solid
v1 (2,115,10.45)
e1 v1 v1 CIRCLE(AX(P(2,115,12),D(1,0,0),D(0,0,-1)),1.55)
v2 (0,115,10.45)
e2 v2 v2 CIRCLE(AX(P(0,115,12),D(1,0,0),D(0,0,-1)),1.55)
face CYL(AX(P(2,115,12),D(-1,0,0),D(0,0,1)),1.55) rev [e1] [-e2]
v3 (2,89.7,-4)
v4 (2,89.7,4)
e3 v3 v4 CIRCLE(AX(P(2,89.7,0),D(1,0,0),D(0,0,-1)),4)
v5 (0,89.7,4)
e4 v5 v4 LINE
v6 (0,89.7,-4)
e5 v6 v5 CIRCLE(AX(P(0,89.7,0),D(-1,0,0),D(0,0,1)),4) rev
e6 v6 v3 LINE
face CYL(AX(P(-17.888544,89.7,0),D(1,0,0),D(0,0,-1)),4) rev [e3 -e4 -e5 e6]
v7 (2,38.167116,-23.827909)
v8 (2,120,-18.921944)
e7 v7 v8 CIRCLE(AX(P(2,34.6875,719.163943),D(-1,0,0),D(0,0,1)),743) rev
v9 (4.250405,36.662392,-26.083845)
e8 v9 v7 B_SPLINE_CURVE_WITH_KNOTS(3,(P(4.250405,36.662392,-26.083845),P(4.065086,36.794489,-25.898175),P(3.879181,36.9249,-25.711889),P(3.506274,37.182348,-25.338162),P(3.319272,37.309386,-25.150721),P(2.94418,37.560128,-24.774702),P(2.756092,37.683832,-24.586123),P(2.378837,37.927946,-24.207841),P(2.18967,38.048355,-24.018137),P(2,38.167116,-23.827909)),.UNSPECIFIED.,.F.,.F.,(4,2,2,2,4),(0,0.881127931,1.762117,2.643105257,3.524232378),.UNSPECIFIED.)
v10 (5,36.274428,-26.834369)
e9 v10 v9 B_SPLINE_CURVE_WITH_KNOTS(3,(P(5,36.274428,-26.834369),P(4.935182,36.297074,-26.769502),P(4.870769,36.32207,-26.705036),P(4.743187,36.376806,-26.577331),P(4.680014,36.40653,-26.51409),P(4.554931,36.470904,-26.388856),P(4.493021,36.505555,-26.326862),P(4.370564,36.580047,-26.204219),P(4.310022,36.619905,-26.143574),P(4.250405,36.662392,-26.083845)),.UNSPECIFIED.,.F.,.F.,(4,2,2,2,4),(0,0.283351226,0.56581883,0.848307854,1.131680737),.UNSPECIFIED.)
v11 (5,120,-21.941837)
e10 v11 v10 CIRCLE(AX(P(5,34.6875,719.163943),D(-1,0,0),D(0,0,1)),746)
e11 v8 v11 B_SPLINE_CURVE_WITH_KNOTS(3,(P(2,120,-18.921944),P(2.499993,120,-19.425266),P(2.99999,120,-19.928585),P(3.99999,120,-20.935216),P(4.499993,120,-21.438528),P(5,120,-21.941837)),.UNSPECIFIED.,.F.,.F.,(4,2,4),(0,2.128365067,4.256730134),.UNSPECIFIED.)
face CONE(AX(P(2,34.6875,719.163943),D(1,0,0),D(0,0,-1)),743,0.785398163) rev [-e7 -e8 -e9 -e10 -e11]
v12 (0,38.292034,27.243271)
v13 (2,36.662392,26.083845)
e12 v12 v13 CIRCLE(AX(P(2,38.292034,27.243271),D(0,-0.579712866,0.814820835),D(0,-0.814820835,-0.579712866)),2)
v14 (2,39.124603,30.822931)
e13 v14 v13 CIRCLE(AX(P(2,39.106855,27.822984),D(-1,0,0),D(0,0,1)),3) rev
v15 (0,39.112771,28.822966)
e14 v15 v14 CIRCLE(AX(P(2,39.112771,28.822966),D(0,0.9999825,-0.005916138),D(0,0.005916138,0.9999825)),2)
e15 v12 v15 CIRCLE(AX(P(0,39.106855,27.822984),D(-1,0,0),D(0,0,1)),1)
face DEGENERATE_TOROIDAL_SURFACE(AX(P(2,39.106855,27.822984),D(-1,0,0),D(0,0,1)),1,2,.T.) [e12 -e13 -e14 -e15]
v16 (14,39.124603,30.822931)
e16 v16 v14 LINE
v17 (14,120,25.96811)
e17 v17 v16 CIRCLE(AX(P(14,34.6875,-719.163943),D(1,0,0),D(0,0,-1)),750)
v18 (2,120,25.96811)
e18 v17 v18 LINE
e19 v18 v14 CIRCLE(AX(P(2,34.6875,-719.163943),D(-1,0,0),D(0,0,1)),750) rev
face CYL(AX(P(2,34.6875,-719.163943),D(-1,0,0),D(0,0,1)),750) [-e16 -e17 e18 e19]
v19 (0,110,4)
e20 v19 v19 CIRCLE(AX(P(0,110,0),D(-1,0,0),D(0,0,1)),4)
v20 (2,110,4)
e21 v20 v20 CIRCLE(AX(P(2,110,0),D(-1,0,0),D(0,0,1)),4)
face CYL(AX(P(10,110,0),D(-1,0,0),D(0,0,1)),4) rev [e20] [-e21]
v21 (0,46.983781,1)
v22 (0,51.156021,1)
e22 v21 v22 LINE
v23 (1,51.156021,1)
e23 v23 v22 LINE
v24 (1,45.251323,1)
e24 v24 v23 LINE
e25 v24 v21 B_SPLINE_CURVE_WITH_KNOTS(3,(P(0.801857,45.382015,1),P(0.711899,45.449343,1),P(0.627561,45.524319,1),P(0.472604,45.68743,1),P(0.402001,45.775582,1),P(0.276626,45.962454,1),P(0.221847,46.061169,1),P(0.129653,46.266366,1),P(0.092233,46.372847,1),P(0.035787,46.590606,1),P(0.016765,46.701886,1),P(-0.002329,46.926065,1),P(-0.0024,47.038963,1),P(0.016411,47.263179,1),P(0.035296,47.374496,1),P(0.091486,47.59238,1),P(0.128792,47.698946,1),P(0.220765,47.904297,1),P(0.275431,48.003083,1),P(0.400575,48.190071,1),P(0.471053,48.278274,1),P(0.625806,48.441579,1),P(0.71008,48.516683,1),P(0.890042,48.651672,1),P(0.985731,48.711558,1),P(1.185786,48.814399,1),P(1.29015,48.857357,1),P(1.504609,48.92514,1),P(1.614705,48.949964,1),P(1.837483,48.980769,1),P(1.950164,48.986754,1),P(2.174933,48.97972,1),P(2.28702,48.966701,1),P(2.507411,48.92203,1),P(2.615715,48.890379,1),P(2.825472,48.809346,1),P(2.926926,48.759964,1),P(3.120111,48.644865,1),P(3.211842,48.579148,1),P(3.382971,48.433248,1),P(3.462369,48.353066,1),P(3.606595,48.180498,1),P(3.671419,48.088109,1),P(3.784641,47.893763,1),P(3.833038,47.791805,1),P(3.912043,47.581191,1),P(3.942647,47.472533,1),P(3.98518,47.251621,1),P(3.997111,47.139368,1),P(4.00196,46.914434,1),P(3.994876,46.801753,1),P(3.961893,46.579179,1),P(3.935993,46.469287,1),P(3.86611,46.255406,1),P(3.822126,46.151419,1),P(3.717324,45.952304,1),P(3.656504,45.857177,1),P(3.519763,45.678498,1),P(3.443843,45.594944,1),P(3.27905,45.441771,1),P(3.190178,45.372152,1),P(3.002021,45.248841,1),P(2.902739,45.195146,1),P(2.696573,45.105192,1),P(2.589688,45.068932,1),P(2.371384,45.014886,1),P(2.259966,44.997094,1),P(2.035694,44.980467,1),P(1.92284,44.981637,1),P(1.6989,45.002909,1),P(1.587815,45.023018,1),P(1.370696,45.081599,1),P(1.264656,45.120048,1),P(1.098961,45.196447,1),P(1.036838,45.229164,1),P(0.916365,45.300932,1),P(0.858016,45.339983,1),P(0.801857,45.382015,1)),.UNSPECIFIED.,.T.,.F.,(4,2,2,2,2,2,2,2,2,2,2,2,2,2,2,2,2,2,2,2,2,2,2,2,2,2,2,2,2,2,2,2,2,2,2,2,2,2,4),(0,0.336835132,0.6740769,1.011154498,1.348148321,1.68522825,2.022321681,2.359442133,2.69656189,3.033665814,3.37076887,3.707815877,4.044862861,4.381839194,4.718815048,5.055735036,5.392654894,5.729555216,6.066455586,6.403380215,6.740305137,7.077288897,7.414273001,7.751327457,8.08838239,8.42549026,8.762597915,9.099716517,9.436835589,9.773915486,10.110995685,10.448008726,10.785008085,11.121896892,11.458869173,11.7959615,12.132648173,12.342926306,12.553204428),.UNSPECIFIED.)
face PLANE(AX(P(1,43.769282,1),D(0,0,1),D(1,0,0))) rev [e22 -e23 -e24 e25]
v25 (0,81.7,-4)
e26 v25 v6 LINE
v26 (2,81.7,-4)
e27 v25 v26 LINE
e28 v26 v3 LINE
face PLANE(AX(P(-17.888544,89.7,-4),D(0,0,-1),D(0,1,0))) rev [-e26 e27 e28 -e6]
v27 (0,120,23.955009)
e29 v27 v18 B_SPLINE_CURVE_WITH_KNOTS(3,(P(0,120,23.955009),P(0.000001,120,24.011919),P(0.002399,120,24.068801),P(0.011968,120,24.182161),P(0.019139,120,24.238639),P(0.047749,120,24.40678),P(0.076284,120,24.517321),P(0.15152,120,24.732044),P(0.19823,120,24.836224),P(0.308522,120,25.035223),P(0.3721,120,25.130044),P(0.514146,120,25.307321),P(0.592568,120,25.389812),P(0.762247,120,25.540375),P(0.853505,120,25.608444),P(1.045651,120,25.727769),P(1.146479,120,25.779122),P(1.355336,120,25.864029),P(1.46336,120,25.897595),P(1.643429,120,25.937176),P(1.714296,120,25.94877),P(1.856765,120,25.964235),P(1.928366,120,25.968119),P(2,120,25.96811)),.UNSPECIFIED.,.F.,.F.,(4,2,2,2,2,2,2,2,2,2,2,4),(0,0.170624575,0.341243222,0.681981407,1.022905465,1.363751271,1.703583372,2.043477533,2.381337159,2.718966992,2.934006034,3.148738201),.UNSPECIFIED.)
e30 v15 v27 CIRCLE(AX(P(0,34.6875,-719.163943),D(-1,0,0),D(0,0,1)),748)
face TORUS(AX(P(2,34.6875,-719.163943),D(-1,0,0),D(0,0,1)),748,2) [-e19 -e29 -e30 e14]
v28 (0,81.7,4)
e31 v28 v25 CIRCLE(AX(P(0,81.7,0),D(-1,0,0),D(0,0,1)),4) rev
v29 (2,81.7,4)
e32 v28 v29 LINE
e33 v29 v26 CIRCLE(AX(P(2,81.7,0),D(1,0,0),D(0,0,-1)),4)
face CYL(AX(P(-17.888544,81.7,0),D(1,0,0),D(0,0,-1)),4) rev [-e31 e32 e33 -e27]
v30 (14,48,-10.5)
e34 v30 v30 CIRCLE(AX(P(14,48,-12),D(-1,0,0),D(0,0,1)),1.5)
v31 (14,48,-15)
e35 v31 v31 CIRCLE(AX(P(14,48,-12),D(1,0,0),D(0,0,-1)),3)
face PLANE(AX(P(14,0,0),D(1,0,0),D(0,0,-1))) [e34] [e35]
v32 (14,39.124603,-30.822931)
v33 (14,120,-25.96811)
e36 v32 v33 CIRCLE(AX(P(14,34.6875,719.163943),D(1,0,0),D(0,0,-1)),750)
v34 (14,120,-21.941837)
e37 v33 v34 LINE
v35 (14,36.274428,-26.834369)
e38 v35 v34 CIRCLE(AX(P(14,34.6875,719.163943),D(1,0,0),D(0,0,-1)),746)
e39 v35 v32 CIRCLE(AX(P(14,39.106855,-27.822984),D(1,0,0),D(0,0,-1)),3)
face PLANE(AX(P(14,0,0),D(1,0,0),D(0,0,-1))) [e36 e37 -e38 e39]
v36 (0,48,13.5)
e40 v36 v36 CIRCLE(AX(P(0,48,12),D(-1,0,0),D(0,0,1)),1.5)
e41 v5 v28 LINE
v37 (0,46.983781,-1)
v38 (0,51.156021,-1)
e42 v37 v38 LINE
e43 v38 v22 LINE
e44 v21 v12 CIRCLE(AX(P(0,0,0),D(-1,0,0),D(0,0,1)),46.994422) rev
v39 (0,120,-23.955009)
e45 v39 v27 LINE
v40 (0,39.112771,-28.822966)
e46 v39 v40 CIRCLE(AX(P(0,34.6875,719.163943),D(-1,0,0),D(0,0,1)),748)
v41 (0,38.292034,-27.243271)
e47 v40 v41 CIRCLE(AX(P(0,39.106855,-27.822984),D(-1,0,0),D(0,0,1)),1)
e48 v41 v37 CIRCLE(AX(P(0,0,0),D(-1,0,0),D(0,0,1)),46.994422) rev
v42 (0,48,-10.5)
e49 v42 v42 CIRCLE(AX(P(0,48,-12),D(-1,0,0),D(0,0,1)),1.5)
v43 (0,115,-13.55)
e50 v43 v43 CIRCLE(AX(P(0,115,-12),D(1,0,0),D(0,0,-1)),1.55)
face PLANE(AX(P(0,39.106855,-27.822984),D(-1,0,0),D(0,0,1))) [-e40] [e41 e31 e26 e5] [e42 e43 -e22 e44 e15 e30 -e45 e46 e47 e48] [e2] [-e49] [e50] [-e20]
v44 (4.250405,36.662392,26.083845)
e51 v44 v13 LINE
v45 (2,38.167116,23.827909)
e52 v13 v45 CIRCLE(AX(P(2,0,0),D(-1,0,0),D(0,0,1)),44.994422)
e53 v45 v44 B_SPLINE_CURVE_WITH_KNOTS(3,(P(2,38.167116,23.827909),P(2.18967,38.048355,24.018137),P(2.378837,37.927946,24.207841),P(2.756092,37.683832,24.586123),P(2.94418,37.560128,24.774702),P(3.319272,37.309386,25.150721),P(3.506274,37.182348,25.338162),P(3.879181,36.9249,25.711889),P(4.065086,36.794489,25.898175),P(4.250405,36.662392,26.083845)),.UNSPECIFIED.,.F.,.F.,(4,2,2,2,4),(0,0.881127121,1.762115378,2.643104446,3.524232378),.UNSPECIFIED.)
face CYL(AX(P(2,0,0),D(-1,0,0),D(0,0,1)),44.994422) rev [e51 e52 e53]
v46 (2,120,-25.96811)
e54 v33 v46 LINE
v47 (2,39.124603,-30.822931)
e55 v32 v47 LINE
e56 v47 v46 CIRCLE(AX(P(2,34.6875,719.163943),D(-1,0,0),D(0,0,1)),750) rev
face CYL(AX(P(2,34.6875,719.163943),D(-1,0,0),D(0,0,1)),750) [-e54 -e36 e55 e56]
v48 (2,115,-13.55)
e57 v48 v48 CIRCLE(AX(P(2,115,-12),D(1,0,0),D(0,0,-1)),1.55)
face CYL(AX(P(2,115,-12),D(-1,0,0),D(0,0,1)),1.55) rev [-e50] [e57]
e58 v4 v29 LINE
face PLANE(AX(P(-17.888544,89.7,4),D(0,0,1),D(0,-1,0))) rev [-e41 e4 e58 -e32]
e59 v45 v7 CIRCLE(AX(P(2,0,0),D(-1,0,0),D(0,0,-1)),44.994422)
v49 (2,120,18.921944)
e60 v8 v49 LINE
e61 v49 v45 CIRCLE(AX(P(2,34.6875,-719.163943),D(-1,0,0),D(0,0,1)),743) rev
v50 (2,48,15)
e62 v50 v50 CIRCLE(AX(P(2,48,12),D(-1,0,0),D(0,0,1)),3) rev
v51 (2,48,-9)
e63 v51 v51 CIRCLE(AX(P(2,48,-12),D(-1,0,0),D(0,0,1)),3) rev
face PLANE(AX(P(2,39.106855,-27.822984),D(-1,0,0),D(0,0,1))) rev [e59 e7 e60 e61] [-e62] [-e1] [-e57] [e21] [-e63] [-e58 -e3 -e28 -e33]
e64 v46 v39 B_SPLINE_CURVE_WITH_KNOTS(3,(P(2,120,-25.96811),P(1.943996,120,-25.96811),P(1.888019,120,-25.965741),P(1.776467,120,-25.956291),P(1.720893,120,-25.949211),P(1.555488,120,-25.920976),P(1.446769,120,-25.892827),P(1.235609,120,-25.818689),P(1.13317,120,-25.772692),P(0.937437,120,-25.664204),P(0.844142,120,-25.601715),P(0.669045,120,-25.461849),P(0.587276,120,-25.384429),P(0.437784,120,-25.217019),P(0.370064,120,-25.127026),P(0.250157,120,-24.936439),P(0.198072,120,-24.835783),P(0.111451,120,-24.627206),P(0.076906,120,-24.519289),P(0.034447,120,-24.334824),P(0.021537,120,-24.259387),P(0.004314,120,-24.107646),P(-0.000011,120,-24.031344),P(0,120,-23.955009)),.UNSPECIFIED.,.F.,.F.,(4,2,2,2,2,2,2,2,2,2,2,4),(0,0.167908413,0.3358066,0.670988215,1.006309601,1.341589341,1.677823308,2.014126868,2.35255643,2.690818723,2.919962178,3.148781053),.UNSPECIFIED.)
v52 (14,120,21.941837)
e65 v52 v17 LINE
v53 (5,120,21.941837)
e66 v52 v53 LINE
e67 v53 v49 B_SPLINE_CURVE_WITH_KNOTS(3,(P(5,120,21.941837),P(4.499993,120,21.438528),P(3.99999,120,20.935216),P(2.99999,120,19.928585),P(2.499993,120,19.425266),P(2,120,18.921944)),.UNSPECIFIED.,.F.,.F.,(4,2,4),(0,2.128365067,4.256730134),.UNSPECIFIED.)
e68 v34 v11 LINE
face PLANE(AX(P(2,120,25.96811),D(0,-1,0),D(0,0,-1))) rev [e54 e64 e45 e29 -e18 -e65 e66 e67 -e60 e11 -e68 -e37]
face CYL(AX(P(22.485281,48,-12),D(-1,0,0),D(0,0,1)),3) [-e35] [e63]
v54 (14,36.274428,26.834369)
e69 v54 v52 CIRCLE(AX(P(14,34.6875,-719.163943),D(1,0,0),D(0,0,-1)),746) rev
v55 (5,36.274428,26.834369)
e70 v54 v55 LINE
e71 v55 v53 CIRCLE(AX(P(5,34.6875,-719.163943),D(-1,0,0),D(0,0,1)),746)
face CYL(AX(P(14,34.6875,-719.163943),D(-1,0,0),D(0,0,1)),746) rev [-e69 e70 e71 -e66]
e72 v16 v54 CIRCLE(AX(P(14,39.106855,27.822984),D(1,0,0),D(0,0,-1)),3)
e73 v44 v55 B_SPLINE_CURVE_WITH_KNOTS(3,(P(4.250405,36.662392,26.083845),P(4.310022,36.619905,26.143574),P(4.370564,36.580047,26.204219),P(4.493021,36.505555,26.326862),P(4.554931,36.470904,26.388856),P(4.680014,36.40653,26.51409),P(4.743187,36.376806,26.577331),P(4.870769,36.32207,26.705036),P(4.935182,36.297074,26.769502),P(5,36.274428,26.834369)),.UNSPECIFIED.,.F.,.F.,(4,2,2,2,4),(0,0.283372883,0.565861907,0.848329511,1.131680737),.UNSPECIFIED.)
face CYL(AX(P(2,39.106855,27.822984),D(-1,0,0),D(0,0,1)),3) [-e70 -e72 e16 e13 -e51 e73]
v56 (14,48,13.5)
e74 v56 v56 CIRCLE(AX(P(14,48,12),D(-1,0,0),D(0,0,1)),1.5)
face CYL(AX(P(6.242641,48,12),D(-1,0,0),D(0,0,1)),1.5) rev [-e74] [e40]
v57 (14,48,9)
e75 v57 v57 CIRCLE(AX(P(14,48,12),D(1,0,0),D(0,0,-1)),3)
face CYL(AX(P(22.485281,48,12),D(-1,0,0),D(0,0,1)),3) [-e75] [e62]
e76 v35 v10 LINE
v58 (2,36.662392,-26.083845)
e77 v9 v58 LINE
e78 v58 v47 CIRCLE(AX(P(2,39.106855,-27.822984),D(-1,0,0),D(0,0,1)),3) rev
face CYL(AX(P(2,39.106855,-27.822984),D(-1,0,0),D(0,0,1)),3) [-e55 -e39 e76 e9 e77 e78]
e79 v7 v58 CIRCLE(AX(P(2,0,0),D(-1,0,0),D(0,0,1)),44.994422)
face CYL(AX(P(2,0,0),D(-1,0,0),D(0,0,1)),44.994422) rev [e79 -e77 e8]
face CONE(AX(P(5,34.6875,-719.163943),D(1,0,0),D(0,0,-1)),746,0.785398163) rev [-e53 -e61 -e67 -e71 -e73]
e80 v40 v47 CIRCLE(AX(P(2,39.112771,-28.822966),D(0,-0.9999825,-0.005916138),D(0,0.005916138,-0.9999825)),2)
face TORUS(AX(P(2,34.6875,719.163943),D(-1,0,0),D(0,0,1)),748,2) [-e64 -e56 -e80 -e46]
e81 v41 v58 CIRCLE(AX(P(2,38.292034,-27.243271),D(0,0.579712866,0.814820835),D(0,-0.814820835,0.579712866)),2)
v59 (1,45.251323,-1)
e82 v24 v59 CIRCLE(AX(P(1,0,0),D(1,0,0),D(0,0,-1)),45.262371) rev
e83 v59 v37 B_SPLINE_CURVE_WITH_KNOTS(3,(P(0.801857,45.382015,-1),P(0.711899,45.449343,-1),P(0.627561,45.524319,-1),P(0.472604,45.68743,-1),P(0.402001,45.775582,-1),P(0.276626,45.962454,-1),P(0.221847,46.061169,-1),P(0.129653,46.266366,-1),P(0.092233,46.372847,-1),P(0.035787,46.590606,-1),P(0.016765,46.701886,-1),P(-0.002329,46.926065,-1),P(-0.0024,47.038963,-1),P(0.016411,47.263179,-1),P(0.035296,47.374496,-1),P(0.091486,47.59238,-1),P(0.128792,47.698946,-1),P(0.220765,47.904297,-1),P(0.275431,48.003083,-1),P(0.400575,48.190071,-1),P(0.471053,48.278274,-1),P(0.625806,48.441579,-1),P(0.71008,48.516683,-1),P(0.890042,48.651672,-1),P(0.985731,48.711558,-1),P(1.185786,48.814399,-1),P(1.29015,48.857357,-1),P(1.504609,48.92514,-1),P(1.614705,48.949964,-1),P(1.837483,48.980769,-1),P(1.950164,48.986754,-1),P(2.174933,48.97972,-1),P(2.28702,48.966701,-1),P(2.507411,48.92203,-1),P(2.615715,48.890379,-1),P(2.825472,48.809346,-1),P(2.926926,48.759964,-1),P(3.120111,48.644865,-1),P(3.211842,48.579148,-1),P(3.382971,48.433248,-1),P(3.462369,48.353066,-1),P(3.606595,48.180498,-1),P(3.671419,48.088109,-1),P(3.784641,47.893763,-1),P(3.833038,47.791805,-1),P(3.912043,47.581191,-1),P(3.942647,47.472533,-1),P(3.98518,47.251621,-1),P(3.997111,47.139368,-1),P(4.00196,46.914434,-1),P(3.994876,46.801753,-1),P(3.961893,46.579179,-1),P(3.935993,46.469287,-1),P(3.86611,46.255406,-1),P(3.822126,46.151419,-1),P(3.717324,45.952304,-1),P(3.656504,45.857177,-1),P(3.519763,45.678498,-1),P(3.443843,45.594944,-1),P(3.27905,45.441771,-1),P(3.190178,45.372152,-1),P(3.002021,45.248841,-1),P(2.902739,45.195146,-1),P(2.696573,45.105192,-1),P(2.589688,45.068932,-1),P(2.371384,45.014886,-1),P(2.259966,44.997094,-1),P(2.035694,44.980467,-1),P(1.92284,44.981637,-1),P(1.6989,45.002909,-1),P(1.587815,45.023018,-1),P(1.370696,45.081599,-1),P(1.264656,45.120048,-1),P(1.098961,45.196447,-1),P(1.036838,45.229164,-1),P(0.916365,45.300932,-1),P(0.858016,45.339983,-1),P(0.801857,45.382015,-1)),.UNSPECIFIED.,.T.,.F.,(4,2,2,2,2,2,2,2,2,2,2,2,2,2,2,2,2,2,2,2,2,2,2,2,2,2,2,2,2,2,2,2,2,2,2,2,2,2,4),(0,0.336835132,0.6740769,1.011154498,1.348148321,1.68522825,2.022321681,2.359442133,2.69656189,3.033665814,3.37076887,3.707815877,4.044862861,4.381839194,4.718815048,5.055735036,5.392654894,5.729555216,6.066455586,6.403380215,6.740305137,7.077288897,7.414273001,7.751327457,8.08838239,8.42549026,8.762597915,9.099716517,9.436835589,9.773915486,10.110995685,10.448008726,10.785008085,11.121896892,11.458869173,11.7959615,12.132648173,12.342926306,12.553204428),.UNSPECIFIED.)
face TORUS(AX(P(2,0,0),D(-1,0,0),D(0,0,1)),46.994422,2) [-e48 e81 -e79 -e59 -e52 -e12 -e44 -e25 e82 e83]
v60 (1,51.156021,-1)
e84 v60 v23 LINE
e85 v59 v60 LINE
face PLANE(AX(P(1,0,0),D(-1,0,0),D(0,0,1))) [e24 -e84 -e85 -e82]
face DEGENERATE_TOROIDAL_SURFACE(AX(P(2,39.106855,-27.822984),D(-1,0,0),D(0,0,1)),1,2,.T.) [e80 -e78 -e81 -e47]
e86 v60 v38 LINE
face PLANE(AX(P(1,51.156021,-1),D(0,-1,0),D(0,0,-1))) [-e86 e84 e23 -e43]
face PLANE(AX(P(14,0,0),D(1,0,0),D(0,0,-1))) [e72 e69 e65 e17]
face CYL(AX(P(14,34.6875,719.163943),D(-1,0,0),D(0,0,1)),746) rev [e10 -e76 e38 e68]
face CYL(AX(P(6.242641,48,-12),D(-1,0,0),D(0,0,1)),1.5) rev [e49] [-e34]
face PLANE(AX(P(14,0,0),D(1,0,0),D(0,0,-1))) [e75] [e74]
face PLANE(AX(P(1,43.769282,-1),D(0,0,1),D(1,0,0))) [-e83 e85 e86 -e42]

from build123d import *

# Parameters (mm, degrees)
SKETCH1_R           = 1.5499999999999983
BOSS_EXTRUDE1_DEPTH = 2
CUT_EXTRUDE1_DEPTH  = 2
BOSS_EXTRUDE2_DEPTH = 12
SKETCH4_R           = 1.5000000000000009
CUT_EXTRUDE2_DEPTH  = 2
SKETCH_8_R          = 3
EXTRUDE_1_DEPTH     = 12
CHAMFER6_SIZE       = 3
SKETCH_1_R          = 4.0000000000000036
CUT_EXTRUDE_1_DEPTH = 10
SKETCH_9_R          = 1.5000000000000009
CUT_EXTRUDE_2_DEPTH = 125.68382559540109
FILLET_1_R          = 2
SKETCH_10_W         = 2
SKETCH_10_H         = 7.38673868931825
CUT_EXTRUDE_3_DEPTH = 1


with BuildPart() as part:
    # Sketch1 → Boss-Extrude1 (new body)
    with BuildSketch(Plane(origin=(0, 0, 0), x_dir=(0, 0, -1), z_dir=(1, 0, 0))):
        with BuildLine():
            Line((-25.968110327255765, 120.00000000000003), (25.968110327255765, 120.00000000000003))
            ThreePointArc((25.968110327255765, 120.00000000000003), (29.488419187011914, 79.62790655837495), (30.82293132778887, 39.124603227985936))
            ThreePointArc((30.82293132778887, 39.124603227985936), (29.206107258133628, 36.44471853371224), (26.083845229838534, 36.66239231138328))
            ThreePointArc((26.083845229838534, 36.66239231138328), (-6.3665e-13, 44.994421787238764), (-26.083845229839092, 36.66239231138189))
            ThreePointArc((-26.083845229839092, 36.66239231138189), (-29.20610725813421, 36.44471853371079), (-30.82293132778949, 39.1246032279845))
            ThreePointArc((-30.82293132778949, 39.1246032279845), (-29.488419187012596, 79.6279065583745), (-25.968110327255765, 120.00000000000003))
        make_face()
        with Locations((-11.999999999999995, 115)):
            Circle(SKETCH1_R, mode=Mode.SUBTRACT)
        with Locations((12.000000000000005, 115)):
            Circle(SKETCH1_R, mode=Mode.SUBTRACT)
    extrude(amount=BOSS_EXTRUDE1_DEPTH)

    # Sketch2 → Cut-Extrude1 (cut)
    with BuildSketch(Plane(origin=(2, 0, 0), x_dir=(0, 0, -1), z_dir=(1, 0, 0))):
        with BuildLine():
            Line((4, 89.70000000000002), (4.000000000000003, 81.7))
            ThreePointArc((4.000000000000003, 81.7), (1.16e-15, 77.7), (-4.000000000000001, 81.7))
            Line((-4.000000000000001, 81.7), (-4.0000000000000036, 89.70000000000002))
            ThreePointArc((-4.0000000000000036, 89.70000000000002), (-3.1e-16, 93.70000000000002), (4, 89.70000000000002))
        make_face()
    extrude(amount=-CUT_EXTRUDE1_DEPTH, mode=Mode.SUBTRACT)

    # Sketch3 → Boss-Extrude2 (add)
    with BuildSketch(Plane(origin=(2, 0, 0), x_dir=(0, 0, -1), z_dir=(1, 0, 0))):
        with BuildLine():
            Line((-21.94183683045926, 120.00000000000003), (-25.968110327255765, 120.00000000000003))
            ThreePointArc((-25.968110327255772, 120.00000000000003), (-29.488419187012482, 79.6279065583743), (-30.82293132778932, 39.124603227984586))
            ThreePointArc((-30.822931327789238, 39.1246032279846), (-29.56718535087633, 36.66600228940771), (-26.834368801169504, 36.274428235935545))
            ThreePointArc((-26.83436880116949, 36.27442823593551), (-25.56563052181184, 78.20602334586083), (-21.941836830459124, 120.00000000000003))
        make_face()
        with BuildLine():
            Line((25.968110327255545, 119.99999999999999), (21.941836830459355, 119.99999999999999))
            ThreePointArc((21.94183683045935, 120.00000000000006), (25.565630521812068, 78.20602334586118), (26.834368801169717, 36.27442823593619))
            ThreePointArc((26.834368801169717, 36.27442823593619), (29.567185350876464, 36.66600228940895), (30.822931327789195, 39.124603227985936))
            ThreePointArc((30.822931327789092, 39.124603227985936), (29.48841918701214, 79.62790655837497), (25.96811032725543, 119.99999999999999))
        make_face()
    extrude(amount=BOSS_EXTRUDE2_DEPTH)

    # Sketch4 → Cut-Extrude2 (cut)
    with BuildSketch(Plane.ZY):
        with Locations((-12, 48)):
            Circle(SKETCH4_R)
        with Locations((12, 48)):
            Circle(SKETCH4_R)
    extrude(amount=-CUT_EXTRUDE2_DEPTH, mode=Mode.SUBTRACT)

    # 草图8 → 凸台-拉伸1 (add)
    with BuildSketch(Plane(origin=(2, 0, 0), x_dir=(0, 0, -1), z_dir=(1, 0, 0))):
        with Locations(Location((-12, 48, 0), (0, 0, 180))):
            Circle(SKETCH_8_R)
        with Locations(Location((12, 48, 0), (0, 0, 180))):
            Circle(SKETCH_8_R)
    extrude(amount=EXTRUDE_1_DEPTH)

    # Chamfer6
    chamfer6_edges = [part.edges().sort_by_distance(p)[0] for p in [
        (2, 78.20602334586118, -25.565630521811954),
        (2, 78.20602334586081, 25.565630521811727),
    ]]
    chamfer(chamfer6_edges, length=CHAMFER6_SIZE)

    # 草图1 → 切除-拉伸1 (cut)
    with BuildSketch(Plane.ZY):
        with Locations((0, 110.00000000000003)):
            Circle(SKETCH_1_R)
    extrude(amount=-CUT_EXTRUDE_1_DEPTH, mode=Mode.SUBTRACT)

    # 草图9 → 切除-拉伸2 (cut, through all)
    with BuildSketch(Plane.ZY):
        with Locations((-12, 48)):
            Circle(SKETCH_9_R)
        with Locations((12, 48)):
            Circle(SKETCH_9_R)
    extrude(amount=-CUT_EXTRUDE_2_DEPTH, mode=Mode.SUBTRACT)

    # 圆角1
    fillet_1_edges = [part.edges().sort_by_distance(p)[0] for p in [
        (0, 44.994421787238764, 4.9916e-13),
        (0, 36.44471853371079, 29.20610725813421),
        (0, 79.62790655837429, 29.488419187012596),
        (0, 79.62790655837495, -29.4884191870118),
        (0, 36.44471853371224, -29.206107258133624),
    ]]
    fillet(fillet_1_edges, radius=FILLET_1_R - 0.0001)  # a hair under: the kernel refuses the full size

    # 草图10 → 切除-拉伸3 (cut)
    with BuildSketch(Plane.ZY):
        with Locations((0, 47.46265164885683)):
            Rectangle(SKETCH_10_W, SKETCH_10_H)
    extrude(amount=-CUT_EXTRUDE_3_DEPTH, mode=Mode.SUBTRACT)


solid = part.part
